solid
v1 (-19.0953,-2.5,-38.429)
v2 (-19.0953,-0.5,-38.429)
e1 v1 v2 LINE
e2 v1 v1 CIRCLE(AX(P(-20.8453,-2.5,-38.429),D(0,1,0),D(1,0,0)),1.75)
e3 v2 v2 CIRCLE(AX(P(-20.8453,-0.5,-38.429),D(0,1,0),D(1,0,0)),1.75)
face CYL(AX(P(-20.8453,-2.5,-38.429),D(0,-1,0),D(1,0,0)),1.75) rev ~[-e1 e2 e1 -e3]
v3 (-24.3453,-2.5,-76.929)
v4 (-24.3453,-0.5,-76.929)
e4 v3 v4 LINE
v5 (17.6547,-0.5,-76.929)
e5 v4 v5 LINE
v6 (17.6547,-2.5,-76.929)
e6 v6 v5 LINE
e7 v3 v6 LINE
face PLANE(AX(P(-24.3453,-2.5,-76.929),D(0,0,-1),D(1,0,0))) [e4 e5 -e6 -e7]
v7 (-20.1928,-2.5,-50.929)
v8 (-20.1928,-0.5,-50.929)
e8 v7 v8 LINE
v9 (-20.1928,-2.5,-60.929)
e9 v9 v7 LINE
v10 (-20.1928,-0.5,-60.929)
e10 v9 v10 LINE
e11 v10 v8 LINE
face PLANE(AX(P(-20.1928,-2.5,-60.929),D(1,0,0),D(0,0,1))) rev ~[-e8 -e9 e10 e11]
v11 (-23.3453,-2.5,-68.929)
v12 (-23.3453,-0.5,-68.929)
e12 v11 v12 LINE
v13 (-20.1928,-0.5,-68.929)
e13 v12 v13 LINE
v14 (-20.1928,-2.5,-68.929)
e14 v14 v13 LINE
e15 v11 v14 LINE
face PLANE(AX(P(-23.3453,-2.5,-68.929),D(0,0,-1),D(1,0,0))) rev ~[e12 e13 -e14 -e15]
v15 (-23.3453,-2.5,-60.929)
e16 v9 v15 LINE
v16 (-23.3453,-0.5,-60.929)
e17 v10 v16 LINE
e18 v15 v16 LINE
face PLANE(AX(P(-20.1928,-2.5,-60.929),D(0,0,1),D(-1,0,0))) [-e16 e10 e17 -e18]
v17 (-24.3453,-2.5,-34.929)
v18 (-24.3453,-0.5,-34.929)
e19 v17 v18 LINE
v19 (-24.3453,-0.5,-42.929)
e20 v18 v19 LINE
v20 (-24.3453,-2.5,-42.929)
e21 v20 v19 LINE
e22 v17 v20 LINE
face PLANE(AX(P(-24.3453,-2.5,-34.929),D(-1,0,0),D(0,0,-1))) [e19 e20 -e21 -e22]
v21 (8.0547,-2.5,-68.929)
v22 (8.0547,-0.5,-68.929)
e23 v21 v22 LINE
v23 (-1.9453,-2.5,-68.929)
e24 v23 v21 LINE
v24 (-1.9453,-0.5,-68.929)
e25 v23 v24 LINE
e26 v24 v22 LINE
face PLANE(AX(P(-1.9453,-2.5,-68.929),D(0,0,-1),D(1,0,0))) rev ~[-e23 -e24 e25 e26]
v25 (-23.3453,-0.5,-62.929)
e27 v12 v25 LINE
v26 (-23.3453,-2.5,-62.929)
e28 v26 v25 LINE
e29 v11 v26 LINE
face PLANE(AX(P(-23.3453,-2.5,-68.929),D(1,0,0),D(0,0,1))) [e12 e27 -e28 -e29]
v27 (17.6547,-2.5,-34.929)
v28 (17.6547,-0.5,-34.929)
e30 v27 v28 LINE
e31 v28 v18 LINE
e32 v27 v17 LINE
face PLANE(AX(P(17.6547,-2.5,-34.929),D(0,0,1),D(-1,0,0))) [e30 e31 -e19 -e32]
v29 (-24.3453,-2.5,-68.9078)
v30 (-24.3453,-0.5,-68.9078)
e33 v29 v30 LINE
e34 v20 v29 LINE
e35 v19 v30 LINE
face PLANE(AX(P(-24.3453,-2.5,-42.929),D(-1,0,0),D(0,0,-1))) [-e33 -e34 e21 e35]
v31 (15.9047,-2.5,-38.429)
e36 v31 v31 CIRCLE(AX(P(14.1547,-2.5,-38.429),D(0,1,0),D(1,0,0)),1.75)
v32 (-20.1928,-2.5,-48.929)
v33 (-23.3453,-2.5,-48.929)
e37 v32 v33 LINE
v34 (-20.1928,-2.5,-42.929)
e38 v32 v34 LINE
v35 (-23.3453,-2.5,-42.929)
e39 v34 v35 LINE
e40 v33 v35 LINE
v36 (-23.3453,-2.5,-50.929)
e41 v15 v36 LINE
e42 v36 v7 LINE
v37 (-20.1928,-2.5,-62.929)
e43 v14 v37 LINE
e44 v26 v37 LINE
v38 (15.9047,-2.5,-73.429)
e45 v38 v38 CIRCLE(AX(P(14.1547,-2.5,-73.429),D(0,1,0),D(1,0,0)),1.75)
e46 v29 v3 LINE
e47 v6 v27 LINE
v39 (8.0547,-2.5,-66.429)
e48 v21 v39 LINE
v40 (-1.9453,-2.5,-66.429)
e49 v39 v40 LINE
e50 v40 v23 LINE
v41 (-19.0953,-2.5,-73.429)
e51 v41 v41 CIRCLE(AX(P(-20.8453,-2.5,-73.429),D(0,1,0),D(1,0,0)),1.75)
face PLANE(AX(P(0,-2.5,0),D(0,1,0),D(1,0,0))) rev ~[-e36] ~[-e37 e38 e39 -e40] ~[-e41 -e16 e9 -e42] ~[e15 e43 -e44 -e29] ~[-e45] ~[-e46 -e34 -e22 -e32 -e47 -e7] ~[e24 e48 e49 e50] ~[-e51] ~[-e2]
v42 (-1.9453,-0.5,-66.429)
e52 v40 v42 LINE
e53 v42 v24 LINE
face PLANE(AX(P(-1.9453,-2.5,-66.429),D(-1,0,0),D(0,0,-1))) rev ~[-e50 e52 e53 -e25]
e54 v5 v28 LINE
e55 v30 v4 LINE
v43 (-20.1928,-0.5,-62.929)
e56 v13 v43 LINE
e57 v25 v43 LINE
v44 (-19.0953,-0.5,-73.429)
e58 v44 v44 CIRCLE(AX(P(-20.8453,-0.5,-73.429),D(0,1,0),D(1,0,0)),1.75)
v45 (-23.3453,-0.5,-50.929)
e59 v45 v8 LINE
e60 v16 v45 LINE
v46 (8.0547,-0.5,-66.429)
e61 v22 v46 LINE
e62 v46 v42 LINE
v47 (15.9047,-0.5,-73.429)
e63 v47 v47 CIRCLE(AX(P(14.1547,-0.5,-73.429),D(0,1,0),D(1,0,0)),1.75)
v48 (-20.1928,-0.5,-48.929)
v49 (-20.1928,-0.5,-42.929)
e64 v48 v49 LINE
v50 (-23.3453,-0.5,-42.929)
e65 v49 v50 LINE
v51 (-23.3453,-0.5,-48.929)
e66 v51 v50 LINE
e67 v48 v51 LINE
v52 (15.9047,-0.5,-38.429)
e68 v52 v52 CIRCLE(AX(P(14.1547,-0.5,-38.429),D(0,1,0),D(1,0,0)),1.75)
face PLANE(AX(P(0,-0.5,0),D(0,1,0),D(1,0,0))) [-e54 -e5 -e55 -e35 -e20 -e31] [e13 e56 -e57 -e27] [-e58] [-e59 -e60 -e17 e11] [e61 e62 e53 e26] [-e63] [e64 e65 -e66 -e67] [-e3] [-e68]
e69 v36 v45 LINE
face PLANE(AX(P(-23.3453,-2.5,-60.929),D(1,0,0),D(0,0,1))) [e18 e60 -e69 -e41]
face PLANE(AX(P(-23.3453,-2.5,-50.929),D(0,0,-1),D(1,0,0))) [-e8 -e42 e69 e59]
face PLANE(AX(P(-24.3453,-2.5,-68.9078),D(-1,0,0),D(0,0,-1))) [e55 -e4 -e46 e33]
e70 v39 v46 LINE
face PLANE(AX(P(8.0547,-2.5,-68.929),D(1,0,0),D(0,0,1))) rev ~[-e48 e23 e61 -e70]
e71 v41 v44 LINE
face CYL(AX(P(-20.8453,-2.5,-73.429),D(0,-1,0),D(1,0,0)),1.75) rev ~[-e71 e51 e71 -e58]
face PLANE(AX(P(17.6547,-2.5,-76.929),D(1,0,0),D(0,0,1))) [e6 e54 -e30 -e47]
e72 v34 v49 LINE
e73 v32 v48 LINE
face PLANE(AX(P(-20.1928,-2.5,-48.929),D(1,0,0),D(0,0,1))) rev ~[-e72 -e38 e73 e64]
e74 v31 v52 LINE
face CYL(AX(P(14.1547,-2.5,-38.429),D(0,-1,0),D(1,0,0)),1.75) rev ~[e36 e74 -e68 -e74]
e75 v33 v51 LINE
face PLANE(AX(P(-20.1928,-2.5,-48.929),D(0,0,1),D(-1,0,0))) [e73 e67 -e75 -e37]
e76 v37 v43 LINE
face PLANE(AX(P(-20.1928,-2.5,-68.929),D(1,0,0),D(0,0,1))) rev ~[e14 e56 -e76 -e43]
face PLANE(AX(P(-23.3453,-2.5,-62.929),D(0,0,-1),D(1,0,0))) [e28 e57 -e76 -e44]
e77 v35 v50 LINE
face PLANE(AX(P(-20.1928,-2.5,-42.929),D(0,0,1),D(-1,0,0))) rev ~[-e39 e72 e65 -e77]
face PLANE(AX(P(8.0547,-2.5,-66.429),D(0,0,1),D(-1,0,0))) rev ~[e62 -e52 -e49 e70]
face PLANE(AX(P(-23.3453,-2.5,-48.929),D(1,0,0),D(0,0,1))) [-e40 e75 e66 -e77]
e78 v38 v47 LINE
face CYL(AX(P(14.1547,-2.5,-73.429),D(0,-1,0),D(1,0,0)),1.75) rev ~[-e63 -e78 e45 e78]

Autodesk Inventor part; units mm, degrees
ref_plane "YZ Plane" through (0, 0, 0) normal (1, 0, 0) x (0, 1, 0)
ref_plane "XZ Plane" through (0, 0, 0) normal (0, 1, 0) x (-1, 0, 0)
ref_plane "XY Plane" through (0, 0, 0) normal (0, 0, 1) x (1, 0, 0)
ref_plane "Work Plane1" through (0, -2.5, 0) normal (0, 1, 0) x (1, 0, 0)
sketch "Sketch10" plane through (0, -2.5, 0) normal (0, 1, 0) x (1, 0, 0)
  line L0 (-24.3453, 76.929) -> (17.6547, 76.929)
  line L1 (17.6547, 76.929) -> (17.6547, 34.929)
  line L2 (17.6547, 34.929) -> (-24.3453, 34.929)
  line L3 (-24.3453, 34.929) -> (-24.3453, 76.929)
  circle A0 centre (-20.8453, 73.429) radius 1.75
  circle A1 centre (14.1547, 73.429) radius 1.75
  circle A2 centre (14.1547, 38.429) radius 1.75
  circle A3 centre (-20.8453, 38.429) radius 1.75
  line L4 (-23.3453, 68.929) -> (-20.1928, 68.929)
  line L5 (-20.1928, 68.929) -> (-20.1928, 42.929)
  line L6 (-20.1928, 42.929) -> (-23.3453, 42.929)
  line L7 (-24.3453, 42.929) -> (-24.3453, 68.9078)
  line L8 (-1.9453, 68.929) -> (8.0547, 68.929)
  line L9 (8.0547, 68.929) -> (8.0547, 66.429)
  line L10 (8.0547, 66.429) -> (-1.9453, 66.429)
  line L11 (-1.9453, 66.429) -> (-1.9453, 68.929)
  line L12 (-23.3453, 62.929) -> (-20.1928, 62.929)
  line L13 (-20.1928, 62.929) -> (-20.1928, 60.929)
  line L14 (-20.1928, 60.929) -> (-23.3453, 60.929)
  line L15 (-23.3453, 50.929) -> (-20.1928, 50.929)
  line L16 (-20.1928, 50.929) -> (-20.1928, 48.929)
  line L17 (-20.1928, 48.929) -> (-23.3453, 48.929)
  line L18 (-23.3453, 68.929) -> (-23.3453, 62.929)
  line L19 (-23.3453, 60.929) -> (-23.3453, 50.929)
  line L20 (-23.3453, 48.929) -> (-23.3453, 42.929)
  point P0 (0, 0)
  point P1 (8.0547, 67.679)
  point P2 (-21.769, 68.929)
  point P3 (-21.769, 62.929)
  point P4 (-21.769, 48.929)
  point P5 (-21.769, 50.929)
  point P6 (-21.769, 42.929)
  dimension "d76" = 42
  dimension "d77" = 42
  dimension "d78" = 3.5
  dimension "d79" = 3.5
  dimension "d80" = 3.5
  dimension "d81" = 3.5
  dimension "d82" = 3.5
  dimension "d83" = 3.5
  dimension "d84" = 3.5
  dimension "d85" = 3.5
  dimension "d86" = 3.5
  dimension "d88" = 10
  dimension "d89" = 2.5
  dimension "d90" = 8
  dimension "d91" = 9.6
  dimension "d92" = 6
  dimension "d93" = 2
  dimension "d94" = 2
  dimension "d95" = 6
  dimension "d96" = 8
  dimension "d97" = 8
extrude "Extrusion9" add sketch "Sketch10" along normal blind 2
equation "\"d80\" = d79"
equation "\"d81\" = d80"
equation "\"d82\" = d80"
equation "\"d83\" = d80"
equation "\"d84\" = d83"
equation "\"d85\" = d80"
equation "\"d86\" = d80"
equation "\"d94\" = d93"
properties part number "display_base"
